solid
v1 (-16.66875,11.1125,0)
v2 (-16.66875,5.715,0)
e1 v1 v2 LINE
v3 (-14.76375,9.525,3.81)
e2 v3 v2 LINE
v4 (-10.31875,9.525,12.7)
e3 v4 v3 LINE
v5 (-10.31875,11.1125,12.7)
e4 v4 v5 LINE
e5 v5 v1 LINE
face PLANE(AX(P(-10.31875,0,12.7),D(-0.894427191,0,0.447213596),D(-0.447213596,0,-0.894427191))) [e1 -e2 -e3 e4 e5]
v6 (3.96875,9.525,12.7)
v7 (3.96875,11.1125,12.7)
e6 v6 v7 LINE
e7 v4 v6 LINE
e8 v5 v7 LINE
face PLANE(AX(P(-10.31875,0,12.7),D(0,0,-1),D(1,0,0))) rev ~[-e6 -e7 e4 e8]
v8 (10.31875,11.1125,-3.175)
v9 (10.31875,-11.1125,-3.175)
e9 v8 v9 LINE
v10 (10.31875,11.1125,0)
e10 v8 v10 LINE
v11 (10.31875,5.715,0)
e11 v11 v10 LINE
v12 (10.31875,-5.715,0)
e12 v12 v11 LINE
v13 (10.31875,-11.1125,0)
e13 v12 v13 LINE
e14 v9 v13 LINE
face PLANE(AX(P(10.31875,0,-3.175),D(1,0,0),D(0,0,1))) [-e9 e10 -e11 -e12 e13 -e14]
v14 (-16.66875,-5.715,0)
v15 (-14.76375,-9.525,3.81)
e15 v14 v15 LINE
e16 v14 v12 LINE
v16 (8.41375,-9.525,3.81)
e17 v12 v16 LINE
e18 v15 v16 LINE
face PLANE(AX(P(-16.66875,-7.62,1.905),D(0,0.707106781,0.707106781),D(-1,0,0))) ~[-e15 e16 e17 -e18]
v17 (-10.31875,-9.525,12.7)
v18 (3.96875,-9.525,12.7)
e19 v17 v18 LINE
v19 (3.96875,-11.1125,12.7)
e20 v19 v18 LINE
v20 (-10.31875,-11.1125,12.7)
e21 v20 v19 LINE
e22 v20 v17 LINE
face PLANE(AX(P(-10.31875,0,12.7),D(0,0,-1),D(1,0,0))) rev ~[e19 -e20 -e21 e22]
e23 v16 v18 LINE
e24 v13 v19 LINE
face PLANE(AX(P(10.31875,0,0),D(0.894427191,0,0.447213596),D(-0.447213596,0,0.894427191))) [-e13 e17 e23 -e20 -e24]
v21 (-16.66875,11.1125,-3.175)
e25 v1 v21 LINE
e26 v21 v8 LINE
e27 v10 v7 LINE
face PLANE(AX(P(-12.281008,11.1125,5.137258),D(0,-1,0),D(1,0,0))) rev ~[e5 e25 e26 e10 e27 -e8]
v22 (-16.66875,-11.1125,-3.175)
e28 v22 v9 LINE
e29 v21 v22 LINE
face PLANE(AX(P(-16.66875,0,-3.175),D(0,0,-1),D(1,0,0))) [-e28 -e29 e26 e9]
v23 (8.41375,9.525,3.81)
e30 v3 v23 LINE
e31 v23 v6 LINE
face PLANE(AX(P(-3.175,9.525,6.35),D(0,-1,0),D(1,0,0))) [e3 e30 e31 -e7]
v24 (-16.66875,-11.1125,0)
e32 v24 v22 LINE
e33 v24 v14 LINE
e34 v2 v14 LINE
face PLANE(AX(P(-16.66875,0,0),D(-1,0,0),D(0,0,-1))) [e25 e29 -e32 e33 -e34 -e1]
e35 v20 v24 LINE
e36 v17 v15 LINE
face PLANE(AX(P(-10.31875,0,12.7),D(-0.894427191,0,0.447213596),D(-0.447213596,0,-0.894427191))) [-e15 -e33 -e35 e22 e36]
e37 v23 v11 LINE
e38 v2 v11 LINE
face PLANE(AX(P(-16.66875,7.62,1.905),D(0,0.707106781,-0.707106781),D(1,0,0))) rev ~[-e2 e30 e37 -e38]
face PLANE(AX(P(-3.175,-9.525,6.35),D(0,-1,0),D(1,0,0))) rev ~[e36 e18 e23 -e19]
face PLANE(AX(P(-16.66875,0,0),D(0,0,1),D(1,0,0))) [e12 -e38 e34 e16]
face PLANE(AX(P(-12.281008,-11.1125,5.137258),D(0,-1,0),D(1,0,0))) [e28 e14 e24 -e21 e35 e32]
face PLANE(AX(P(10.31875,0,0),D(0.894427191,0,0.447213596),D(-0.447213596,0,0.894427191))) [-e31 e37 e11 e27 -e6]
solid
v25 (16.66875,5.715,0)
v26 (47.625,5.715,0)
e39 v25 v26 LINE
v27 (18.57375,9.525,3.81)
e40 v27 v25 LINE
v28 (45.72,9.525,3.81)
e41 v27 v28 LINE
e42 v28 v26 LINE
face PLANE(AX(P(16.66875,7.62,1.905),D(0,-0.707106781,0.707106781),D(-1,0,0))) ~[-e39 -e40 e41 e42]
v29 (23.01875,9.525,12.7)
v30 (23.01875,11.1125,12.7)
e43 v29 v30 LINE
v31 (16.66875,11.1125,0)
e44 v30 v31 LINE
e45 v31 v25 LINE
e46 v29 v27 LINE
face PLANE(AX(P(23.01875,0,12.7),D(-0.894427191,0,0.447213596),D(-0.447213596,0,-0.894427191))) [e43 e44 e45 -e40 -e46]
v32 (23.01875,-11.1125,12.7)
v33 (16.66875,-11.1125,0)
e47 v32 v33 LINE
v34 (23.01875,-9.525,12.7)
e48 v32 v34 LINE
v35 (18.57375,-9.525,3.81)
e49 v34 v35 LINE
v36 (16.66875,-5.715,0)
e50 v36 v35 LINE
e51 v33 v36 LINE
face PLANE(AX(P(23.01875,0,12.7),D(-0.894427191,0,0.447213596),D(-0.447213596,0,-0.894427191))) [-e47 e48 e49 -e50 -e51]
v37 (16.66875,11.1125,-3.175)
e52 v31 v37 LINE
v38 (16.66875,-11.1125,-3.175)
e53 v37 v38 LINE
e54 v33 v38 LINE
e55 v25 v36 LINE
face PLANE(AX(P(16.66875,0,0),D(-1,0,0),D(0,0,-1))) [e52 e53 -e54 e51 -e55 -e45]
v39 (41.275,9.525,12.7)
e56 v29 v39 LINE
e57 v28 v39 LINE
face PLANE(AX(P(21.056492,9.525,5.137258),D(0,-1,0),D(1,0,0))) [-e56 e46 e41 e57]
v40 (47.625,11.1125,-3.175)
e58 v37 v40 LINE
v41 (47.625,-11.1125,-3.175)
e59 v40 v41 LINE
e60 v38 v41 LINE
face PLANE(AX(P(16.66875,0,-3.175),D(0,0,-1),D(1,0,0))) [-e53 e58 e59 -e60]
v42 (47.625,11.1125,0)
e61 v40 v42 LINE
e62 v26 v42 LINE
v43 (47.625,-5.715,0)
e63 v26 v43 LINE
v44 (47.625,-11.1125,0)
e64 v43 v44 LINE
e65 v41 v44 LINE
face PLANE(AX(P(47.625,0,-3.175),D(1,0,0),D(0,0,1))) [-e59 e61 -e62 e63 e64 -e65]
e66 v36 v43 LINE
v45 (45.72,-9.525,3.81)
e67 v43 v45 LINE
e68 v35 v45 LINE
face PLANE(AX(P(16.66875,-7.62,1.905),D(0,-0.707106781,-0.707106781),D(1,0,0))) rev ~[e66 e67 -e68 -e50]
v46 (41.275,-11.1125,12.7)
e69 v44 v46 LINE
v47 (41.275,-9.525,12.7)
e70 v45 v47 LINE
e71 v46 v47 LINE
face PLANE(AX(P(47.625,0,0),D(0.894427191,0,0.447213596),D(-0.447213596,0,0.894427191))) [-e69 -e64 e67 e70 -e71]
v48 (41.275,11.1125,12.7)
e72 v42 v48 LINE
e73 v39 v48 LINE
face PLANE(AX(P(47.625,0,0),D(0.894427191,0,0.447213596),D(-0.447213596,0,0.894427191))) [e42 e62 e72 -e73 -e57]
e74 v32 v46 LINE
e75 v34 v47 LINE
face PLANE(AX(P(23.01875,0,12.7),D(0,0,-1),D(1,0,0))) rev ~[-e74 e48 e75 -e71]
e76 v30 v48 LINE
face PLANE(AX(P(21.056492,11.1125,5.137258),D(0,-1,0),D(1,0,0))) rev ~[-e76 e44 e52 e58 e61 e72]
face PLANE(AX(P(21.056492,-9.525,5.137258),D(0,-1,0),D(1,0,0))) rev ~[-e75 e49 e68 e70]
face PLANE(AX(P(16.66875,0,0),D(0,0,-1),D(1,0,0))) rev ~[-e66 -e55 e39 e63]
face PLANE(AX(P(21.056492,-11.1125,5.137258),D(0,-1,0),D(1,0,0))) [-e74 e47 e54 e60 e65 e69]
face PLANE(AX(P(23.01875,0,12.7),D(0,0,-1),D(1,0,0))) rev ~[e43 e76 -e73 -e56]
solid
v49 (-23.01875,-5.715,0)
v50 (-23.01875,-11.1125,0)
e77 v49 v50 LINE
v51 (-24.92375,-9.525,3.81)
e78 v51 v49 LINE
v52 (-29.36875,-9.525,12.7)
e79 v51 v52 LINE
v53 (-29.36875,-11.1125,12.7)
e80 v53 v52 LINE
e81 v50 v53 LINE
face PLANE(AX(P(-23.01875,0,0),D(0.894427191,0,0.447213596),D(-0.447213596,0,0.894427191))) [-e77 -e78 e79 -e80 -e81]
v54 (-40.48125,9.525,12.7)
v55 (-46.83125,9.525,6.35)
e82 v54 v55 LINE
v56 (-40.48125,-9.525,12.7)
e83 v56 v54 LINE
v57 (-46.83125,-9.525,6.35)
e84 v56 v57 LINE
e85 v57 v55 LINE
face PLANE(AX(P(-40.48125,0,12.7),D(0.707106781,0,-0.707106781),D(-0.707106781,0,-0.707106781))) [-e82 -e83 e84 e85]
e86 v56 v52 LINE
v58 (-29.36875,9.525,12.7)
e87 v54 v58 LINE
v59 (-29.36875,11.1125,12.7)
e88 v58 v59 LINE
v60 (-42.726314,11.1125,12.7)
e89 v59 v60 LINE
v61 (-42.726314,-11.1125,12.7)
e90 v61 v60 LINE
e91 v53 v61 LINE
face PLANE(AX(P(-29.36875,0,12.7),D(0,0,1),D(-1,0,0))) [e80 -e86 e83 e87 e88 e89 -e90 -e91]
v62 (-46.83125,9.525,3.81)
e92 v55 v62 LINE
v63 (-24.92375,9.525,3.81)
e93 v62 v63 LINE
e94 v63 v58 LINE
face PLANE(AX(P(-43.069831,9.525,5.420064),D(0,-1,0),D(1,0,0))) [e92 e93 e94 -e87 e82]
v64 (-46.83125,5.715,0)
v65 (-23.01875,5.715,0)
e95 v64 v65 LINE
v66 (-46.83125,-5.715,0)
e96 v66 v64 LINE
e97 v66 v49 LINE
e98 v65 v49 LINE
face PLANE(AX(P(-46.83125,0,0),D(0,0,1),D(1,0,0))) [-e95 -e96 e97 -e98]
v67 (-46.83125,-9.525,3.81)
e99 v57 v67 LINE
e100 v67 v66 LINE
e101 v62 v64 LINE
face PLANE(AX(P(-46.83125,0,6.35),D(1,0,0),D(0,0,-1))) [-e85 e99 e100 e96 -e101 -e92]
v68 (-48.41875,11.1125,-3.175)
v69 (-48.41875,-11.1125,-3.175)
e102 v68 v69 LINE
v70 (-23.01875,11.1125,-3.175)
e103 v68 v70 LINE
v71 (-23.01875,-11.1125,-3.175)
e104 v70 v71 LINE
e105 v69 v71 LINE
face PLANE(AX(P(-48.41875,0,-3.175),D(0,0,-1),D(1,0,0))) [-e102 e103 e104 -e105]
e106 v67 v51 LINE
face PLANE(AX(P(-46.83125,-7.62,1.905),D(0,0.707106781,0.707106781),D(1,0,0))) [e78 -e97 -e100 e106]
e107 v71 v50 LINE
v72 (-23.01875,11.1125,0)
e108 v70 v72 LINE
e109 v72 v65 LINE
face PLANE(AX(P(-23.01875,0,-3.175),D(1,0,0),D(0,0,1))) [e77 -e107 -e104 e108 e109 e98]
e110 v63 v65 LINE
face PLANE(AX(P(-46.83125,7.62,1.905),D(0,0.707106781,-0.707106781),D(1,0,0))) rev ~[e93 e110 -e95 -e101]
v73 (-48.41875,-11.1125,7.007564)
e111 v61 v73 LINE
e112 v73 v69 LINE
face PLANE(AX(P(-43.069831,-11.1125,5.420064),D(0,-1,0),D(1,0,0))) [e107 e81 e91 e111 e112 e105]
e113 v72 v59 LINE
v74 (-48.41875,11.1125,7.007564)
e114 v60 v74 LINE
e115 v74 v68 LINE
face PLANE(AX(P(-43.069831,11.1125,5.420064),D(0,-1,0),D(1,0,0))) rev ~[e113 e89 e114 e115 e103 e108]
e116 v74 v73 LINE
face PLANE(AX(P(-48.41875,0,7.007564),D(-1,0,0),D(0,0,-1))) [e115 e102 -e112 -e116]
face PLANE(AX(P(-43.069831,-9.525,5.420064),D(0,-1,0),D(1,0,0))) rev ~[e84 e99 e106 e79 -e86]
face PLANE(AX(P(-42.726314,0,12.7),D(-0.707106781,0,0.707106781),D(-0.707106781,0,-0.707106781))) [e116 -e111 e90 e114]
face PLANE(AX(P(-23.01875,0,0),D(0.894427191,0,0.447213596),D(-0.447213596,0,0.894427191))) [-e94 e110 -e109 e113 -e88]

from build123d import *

# Parameters (mm, degrees)
F0_W      = 11.1125
F0_H      = 12.7
F1_DEPTH  = 11.1125
F0_W_2    = 14.2875
F0_W_3    = 18.25625
F2_DEPTH  = 9.525
F3_SIZE   = 3.81
F3_2_SIZE = 3.81
F3_3_SIZE = 3.81


# Not quite as in the source:
# - a feature names something its author has since deleted; it is built from what else it names


with BuildPart() as f1:
    # F0 (on Front) → F1 (new body, symmetric)
    with BuildSketch(Plane.XZ):
        Polygon((-46.83125, 0), (-40.48125, 0), (-40.48125, 12.7), (-46.83125, 6.35), align=None)
        Polygon((-29.36875, 0), (-23.01875, 0), (-29.36875, 12.7), align=None)
        Polygon((-48.41875, -3.175), (-46.83125, -3.175), (-46.83125, 0), (-46.83125, 6.35), (-40.48125, 12.7), (-42.7263140303, 12.7), (-48.41875, 7.0075640303), (-48.41875, 6.35), align=None)
        Polygon((-23.01875, -3.175), (-23.01875, 0), (-29.36875, 0), (-40.48125, 0), (-46.83125, 0), (-46.83125, -3.175), align=None)
        with Locations((-34.925, 6.35)):
            Rectangle(F0_W, F0_H)
    extrude(amount=F1_DEPTH, both=True)


with BuildPart() as f1b:
    # F0 (on Front) → F1, piece 2 (new body, symmetric)
    with BuildSketch(Plane.XZ):
        Polygon((-16.66875, 0), (-10.31875, 0), (-10.31875, 12.7), align=None)
        Polygon((3.96875, 0), (10.31875, 0), (3.96875, 12.7), align=None)
        Polygon((10.31875, -3.175), (10.31875, 0), (3.96875, 0), (-10.31875, 0), (-16.66875, 0), (-16.66875, -3.175), align=None)
        with Locations((-3.175, 6.35)):
            Rectangle(F0_W_2, F0_H)
    extrude(amount=F1_DEPTH, both=True)


with BuildPart() as f1c:
    # F0 (on Front) → F1, piece 3 (new body, symmetric)
    with BuildSketch(Plane.XZ):
        Polygon((23.01875, 12.7), (16.66875, 0), (23.01875, 0), align=None)
        Polygon((41.275, 0), (47.625, 0), (41.275, 12.7), align=None)
        Polygon((16.66875, 0), (16.66875, -3.175), (47.625, -3.175), (47.625, 0), (41.275, 0), (23.01875, 0), align=None)
        with Locations((32.146875, 6.35)):
            Rectangle(F0_W_3, F0_H)
    extrude(amount=F1_DEPTH, both=True)


with BuildPart() as f2_tool:
    # F0 (on Front) → F2 (new body, symmetric)
    with BuildSketch(Plane.XZ):
        Polygon((-46.83125, 0), (-40.48125, 0), (-40.48125, 12.7), (-46.83125, 6.35), align=None)
        with Locations((-34.925, 6.35)):
            Rectangle(F0_W, F0_H)
        Polygon((-29.36875, 0), (-23.01875, 0), (-29.36875, 12.7), align=None)
        with Locations((-3.175, 6.35)):
            Rectangle(F0_W_2, F0_H)
        Polygon((-16.66875, 0), (-10.31875, 0), (-10.31875, 12.7), align=None)
        Polygon((3.96875, 0), (10.31875, 0), (3.96875, 12.7), align=None)
        Polygon((23.01875, 12.7), (16.66875, 0), (23.01875, 0), align=None)
        with Locations((32.146875, 6.35)):
            Rectangle(F0_W_3, F0_H)
        Polygon((41.275, 0), (47.625, 0), (41.275, 12.7), align=None)
    extrude(amount=F2_DEPTH, both=True)


with BuildPart() as f1_1:
    add(f1.part)

    # F2: cut by f2_tool
    add(f2_tool.part, mode=Mode.SUBTRACT)

    # F3
    f3_edges = [f1_1.edges().sort_by_distance(p)[0] for p in [
        (-34.925, -9.525, 0),
        (-34.925, 9.525, 0),
    ]]
    chamfer(f3_edges, length=F3_SIZE)


with BuildPart() as f1b_1:
    add(f1b.part)

    # F2: cut by f2_tool
    add(f2_tool.part, mode=Mode.SUBTRACT)

    # F3#2
    f3_2_edges = [f1b_1.edges().sort_by_distance(p)[0] for p in [
        (-3.175, 9.525, 0),
        (-3.175, -9.525, 0),
    ]]
    chamfer(f3_2_edges, length=F3_2_SIZE)


with BuildPart() as f1c_1:
    add(f1c.part)

    # F2: cut by f2_tool
    add(f2_tool.part, mode=Mode.SUBTRACT)

    # F3#3
    f3_3_edges = [f1c_1.edges().sort_by_distance(p)[0] for p in [
        (32.146875, 9.525, 0),
        (32.146875, -9.525, 0),
    ]]
    chamfer(f3_3_edges, length=F3_3_SIZE)


solid = Compound([f1_1.part, f1b_1.part, f1c_1.part])
